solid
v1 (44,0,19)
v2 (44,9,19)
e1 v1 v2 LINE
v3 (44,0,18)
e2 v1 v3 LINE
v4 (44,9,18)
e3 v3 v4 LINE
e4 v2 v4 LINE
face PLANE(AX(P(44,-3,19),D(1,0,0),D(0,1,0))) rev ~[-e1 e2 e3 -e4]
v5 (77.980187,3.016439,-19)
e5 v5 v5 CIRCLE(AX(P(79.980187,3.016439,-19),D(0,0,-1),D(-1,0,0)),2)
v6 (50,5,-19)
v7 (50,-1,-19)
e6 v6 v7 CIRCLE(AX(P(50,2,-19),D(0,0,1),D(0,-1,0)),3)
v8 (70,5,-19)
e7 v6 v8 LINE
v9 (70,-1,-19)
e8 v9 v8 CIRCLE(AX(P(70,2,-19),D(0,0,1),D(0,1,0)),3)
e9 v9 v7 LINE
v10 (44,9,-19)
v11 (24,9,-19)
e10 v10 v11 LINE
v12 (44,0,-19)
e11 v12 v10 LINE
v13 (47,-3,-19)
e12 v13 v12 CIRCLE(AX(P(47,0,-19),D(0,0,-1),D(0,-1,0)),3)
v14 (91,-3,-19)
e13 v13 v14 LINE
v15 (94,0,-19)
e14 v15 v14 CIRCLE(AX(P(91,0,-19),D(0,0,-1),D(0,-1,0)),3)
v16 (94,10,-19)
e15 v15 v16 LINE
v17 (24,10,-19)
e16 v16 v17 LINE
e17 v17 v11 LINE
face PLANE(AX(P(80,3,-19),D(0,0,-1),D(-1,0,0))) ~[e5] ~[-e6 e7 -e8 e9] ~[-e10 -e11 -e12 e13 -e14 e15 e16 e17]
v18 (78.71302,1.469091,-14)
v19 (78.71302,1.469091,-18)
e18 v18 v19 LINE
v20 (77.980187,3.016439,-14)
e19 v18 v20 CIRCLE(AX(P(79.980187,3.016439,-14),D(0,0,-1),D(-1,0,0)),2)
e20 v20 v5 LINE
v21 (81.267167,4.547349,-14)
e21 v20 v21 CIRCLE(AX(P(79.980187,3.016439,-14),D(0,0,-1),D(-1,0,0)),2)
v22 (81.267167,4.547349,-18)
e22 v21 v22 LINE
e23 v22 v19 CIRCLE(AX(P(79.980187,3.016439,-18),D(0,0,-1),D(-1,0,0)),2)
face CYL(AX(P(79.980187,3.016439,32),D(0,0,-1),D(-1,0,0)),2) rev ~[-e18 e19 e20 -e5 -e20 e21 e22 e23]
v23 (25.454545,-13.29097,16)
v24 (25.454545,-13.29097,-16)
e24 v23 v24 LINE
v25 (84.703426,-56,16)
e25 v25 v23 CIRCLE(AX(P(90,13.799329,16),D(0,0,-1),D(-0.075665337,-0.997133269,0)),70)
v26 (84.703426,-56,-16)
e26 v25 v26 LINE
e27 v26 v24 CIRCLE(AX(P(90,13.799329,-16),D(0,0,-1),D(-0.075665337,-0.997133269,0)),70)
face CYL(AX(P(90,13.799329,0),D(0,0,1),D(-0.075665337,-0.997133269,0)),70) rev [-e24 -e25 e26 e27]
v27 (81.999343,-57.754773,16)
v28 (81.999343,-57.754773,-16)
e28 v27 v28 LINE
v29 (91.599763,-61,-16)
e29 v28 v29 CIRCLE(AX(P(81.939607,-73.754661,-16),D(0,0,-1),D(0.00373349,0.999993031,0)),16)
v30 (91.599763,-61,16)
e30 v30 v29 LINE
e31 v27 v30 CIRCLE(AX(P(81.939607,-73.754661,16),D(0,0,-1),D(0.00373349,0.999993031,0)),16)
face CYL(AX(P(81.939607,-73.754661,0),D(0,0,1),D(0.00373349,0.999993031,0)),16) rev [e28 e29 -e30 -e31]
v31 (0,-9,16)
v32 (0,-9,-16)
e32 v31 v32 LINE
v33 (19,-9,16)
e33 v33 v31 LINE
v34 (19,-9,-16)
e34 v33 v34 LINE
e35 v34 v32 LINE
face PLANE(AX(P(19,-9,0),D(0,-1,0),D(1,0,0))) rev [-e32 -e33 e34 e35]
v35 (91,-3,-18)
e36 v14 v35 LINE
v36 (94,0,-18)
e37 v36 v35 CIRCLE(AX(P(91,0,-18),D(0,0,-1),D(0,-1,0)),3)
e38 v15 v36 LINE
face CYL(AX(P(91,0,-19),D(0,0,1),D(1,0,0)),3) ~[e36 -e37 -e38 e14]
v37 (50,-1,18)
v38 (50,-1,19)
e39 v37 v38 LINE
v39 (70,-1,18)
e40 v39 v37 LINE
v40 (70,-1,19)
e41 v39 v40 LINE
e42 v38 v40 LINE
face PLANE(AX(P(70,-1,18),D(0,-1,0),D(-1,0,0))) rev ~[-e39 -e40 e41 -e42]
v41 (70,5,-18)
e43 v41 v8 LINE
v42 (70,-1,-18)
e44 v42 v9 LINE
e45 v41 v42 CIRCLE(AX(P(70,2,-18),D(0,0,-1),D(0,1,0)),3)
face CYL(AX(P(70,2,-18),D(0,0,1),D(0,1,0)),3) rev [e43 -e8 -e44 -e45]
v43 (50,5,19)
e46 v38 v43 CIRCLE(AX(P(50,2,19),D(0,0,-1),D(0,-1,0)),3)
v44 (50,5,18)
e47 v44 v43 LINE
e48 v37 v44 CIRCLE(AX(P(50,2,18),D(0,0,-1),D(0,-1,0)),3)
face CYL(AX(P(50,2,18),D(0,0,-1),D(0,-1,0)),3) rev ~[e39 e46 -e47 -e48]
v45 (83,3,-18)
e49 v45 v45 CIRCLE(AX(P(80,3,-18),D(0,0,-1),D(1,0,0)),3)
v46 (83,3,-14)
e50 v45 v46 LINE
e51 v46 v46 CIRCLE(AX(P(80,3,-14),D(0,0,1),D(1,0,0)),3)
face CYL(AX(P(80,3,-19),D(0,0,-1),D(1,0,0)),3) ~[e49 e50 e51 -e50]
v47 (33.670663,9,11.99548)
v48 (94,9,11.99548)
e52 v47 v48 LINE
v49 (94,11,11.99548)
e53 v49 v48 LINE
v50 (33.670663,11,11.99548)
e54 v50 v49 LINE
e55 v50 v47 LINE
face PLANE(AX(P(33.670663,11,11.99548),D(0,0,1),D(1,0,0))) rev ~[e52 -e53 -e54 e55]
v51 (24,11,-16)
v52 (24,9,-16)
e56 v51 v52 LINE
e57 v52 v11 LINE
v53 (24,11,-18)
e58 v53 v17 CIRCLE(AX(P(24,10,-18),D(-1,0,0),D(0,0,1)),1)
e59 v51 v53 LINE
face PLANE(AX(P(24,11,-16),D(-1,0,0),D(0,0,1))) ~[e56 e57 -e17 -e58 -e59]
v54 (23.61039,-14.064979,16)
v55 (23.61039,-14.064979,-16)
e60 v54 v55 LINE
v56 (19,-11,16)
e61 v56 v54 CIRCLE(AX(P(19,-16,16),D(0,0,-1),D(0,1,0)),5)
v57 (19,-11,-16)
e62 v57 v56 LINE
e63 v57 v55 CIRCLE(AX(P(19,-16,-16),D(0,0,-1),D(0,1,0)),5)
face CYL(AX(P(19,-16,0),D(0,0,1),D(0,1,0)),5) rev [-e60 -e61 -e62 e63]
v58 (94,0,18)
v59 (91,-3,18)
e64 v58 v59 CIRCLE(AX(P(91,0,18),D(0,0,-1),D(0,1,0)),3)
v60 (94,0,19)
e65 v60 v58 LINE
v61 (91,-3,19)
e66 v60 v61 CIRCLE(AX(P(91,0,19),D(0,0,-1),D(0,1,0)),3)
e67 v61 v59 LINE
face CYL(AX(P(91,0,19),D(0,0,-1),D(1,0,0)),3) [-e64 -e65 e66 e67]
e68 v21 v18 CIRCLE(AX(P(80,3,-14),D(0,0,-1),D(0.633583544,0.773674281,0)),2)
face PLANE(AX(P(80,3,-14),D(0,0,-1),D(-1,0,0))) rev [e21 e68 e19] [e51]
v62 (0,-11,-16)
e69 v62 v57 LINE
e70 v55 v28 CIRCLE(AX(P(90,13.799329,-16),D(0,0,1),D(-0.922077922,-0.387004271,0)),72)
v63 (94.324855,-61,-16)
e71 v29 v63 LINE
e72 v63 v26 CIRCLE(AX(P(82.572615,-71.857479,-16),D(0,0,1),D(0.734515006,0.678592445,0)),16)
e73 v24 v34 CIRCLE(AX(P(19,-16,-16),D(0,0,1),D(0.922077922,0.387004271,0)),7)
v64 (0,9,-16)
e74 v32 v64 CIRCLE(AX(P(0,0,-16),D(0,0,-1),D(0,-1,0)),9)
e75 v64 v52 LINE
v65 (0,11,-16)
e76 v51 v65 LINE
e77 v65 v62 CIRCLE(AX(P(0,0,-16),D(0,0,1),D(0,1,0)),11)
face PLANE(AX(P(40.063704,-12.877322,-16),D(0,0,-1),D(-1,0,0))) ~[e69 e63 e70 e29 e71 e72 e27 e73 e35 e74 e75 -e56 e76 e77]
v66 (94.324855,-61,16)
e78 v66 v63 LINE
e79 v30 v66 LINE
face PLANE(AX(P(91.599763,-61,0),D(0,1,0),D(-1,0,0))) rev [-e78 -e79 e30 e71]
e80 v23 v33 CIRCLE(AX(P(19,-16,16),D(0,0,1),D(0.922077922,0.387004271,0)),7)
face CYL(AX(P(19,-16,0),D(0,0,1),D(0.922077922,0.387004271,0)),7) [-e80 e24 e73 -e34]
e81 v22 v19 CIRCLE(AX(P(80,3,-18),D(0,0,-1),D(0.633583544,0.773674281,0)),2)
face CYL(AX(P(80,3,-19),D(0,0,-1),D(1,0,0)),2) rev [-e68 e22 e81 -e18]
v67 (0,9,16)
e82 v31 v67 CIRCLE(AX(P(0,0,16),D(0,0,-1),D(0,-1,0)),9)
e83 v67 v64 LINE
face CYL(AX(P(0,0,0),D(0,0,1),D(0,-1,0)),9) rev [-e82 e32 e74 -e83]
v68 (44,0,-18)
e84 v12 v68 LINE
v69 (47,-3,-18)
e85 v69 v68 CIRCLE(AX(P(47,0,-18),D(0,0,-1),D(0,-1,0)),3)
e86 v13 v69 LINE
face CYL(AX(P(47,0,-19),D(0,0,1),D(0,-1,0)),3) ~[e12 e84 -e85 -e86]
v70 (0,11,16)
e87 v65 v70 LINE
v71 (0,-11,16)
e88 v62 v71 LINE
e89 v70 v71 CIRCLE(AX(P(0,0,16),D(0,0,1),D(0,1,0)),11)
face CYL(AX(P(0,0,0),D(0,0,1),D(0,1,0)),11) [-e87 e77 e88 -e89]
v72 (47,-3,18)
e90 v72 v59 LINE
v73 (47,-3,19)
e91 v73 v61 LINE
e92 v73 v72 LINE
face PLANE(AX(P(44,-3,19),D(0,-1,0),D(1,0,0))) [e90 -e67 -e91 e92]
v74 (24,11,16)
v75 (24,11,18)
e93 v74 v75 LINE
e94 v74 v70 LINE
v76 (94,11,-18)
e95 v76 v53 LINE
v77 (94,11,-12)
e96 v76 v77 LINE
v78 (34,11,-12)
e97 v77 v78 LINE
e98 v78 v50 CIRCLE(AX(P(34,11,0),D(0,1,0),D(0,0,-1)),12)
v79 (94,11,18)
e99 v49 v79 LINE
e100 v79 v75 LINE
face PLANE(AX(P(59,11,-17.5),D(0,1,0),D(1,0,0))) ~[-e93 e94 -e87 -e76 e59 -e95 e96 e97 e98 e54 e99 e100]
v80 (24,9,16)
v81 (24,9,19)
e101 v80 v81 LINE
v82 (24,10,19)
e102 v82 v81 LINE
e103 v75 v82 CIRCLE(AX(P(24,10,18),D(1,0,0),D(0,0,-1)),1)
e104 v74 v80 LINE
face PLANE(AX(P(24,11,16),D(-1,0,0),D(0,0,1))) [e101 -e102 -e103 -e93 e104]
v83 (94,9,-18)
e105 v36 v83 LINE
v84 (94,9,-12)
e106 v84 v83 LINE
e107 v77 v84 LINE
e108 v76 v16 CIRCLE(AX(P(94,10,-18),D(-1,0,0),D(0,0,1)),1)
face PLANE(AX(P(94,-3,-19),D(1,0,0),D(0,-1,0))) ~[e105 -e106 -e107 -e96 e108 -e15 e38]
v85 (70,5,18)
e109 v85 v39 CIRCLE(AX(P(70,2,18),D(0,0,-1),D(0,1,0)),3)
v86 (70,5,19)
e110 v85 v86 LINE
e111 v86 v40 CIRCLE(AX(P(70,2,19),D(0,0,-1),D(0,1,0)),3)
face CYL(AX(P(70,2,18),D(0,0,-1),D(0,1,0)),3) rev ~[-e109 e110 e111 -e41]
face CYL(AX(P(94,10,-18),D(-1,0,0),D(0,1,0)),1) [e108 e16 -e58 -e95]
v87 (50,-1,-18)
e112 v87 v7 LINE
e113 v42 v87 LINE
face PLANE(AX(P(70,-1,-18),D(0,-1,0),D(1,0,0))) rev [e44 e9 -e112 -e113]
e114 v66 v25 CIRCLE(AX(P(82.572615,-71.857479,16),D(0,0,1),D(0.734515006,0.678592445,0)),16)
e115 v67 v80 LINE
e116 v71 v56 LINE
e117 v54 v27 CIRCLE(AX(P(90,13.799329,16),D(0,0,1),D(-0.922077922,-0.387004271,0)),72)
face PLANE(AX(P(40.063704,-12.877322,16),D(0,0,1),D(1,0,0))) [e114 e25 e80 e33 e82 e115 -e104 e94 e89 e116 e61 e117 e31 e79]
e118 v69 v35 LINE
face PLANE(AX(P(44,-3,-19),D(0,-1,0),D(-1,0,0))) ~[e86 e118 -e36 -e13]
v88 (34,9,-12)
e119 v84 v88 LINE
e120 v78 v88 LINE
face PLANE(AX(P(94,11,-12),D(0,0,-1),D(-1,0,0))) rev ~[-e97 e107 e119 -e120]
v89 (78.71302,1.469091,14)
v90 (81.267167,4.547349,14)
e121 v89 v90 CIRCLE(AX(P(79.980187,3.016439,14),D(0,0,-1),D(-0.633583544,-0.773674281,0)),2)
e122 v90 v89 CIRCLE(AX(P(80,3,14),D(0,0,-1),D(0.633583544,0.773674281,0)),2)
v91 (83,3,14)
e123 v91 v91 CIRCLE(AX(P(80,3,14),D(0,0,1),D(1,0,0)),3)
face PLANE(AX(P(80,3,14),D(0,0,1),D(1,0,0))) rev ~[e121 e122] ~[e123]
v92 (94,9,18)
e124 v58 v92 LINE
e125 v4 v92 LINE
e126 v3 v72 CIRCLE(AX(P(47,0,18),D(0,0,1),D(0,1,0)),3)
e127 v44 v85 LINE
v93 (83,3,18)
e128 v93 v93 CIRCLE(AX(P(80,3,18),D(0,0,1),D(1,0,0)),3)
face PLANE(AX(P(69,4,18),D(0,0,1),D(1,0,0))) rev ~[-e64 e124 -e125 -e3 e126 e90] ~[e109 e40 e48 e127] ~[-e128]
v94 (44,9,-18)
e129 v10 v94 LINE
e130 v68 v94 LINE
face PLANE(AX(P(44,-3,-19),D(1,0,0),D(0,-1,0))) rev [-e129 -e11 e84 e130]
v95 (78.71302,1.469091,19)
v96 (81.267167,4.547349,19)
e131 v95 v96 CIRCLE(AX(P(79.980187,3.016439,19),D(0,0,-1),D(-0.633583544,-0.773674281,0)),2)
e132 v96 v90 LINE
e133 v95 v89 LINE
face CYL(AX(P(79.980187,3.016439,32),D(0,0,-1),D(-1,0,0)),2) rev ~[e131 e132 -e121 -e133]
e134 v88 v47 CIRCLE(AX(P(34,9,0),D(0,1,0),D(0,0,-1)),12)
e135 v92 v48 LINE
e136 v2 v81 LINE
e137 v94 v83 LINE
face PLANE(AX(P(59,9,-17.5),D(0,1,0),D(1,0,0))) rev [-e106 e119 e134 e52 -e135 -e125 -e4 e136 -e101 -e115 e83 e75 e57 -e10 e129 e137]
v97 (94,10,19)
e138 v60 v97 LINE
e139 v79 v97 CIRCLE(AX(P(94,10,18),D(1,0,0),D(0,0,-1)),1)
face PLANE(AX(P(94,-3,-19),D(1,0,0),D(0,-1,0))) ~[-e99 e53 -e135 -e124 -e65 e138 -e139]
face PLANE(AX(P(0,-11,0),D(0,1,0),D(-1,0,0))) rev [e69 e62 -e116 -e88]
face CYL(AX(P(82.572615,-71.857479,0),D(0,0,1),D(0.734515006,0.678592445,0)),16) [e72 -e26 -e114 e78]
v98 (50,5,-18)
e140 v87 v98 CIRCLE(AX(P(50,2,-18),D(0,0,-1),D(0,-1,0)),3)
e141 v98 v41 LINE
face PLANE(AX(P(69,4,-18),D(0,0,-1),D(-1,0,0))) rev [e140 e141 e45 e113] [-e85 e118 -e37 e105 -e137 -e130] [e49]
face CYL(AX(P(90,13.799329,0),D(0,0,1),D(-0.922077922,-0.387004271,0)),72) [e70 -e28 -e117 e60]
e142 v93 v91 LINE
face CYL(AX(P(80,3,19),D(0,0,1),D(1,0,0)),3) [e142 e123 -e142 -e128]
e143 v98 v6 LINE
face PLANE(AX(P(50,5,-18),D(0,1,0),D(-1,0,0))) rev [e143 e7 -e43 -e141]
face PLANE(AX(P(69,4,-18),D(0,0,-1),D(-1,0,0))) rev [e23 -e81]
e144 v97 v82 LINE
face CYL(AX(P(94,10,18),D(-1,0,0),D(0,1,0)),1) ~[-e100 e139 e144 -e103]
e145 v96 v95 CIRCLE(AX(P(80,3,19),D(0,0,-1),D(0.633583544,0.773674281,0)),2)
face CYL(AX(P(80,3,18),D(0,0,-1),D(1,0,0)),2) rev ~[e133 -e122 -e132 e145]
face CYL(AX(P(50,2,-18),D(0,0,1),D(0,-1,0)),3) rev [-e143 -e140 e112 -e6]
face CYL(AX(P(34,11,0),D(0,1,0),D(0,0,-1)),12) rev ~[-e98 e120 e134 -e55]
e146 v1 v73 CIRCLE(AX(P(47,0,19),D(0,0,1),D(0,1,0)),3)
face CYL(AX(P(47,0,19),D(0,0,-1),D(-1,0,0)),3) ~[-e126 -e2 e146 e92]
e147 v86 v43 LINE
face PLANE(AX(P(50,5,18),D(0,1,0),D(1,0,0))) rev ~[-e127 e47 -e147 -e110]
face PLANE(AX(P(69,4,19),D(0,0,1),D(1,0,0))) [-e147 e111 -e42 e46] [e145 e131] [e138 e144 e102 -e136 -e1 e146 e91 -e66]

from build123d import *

# Parameters (mm, degrees)
F1_DEPTH  = 16
F2_W      = 70
F2_H      = 3
F3_DEPTH  = 2
F4_W      = 50
F4_H      = 14
F5_DEPTH  = 1
F6_R      = 1
F9_DEPTH  = 2
F11_DEPTH = 1.001
F13_D     = 4
F13_DEPTH = 50
F13_TIP   = 1.2017212381
F14_R     = 3
F14_R_2   = 2
F15_DEPTH = 5
F16_R     = 3
F18_D     = 4
F18_DEPTH = 50
F18_START = 37
F18_TIP   = 1.2017212381


# Not quite as in the source:
# - a pattern or mirror of a feature is missing from the dataset's text; its kind, count and spacing are read off the source's solid
# - a feature names something its author has since deleted; it is built from what else it names


with BuildPart() as f1:
    # F0 (on Top) → F1 (new body)
    with BuildSketch(Plane.XY):
        with BuildLine():
            Line((94, 11), (0, 11))
            ThreePointArc((0, 11), (-11, 0), (0, -11))
            Line((0, -11), (19, -11))
            ThreePointArc((19, -11), (21.7681124643, -11.8361612201), (23.6103896104, -14.064978646))
            ThreePointArc((23.6103896104, -14.064978646), (46.8644288503, -43.8489365308), (81.9993431207, -57.7547729841))
            ThreePointArc((81.9993431207, -57.7547729841), (87.0632727772, -58.5972193444), (91.5997631119, -61))
            Line((91.5997631119, -61), (94.3248553538, -61))
            ThreePointArc((94.3248553538, -61), (89.9506080698, -57.6601123846), (84.7034264019, -56))
            ThreePointArc((84.7034264019, -56), (49.0672193413, -42.9854179344), (25.4545454545, -13.2909701044))
            ThreePointArc((25.4545454545, -13.2909701044), (22.87535745, -10.1706257081), (19, -9))
            Line((19, -9), (0, -9))
            ThreePointArc((0, -9), (-9, 0), (0, 9))
            Line((0, 9), (94, 9))
            Line((94, 9), (94, 11))
        make_face()
    extrude(amount=F1_DEPTH)

    # F2 (on face) → F3 (join)
    with BuildSketch(Plane(origin=(0, 11, 0), x_dir=(-1, 0, 0), z_dir=(0, 1, 0))):
        with Locations((-59, 17.5)):
            Rectangle(F2_W, F2_H)
    extrude(amount=-F3_DEPTH)

    # F4 (on face) → F5 (join)
    with BuildSketch(Plane.XY.offset(19)):
        with Locations((69, 4)):
            Rectangle(F4_W, F4_H)
    extrude(amount=-F5_DEPTH)

    # F6
    f6_edges = [f1.edges().sort_by_distance(p)[0] for p in [
        (59, 11, 19),
    ]]
    fillet(f6_edges, radius=F6_R)

    # F7: F1 across face


with BuildPart() as f1_1:
    add(f1.part)
    add(f1.part.mirror(Plane(origin=(39.0198924269, -12.8147332924, 0), x_dir=(1, 0, 0), z_dir=(0, 0, -1))))

    # F8 (on face) → F9 (cut)
    with BuildSketch(Plane(origin=(0, 11, 0), x_dir=(-1, 0, 0), z_dir=(0, 1, 0))):
        with BuildLine():
            Line((-94, -12), (-34, -12))
            ThreePointArc((-34, -12), (-22.001130085, -0.1646838272), (-33.6706633635, 11.9954798728))
            Line((-33.6706633635, 11.9954798728), (-34.3293366365, 11.9954798728))
            Line((-34.3293366365, 11.9954798728), (-94, 11.9954798728))
            Line((-94, 11.9954798728), (-94, -12))
        make_face()
    extrude(amount=-F9_DEPTH, mode=Mode.SUBTRACT)

    # F10 (on face) → F11 (cut, through all)
    with BuildSketch(Plane(origin=(0, 0, 18), x_dir=(1, 0, 0), z_dir=(0, 0, -1))):
        with BuildLine():
            ThreePointArc((50, 1), (47, -2), (50, -5))
            Line((50, -5), (70, -5))
            ThreePointArc((70, -5), (73, -2), (70, 1))
            Line((70, 1), (50, 1))
        make_face()
    f11 = extrude(amount=-F11_DEPTH, mode=Mode.SUBTRACT)

    # F11_copies: F11 across plane
    add(f11.mirror(Plane(origin=(0, 0, 0), x_dir=(-1, 0, 0), z_dir=(0, 0, -1))), mode=Mode.SUBTRACT)

    # F13 (one way)
    with BuildSketch(Plane(origin=(0, 0, 18), x_dir=(1, 0, 0), z_dir=(0, 0, -1))):
        with Locations((80, -3)):
            Circle(F13_D / 2)
    extrude(amount=-F13_DEPTH, mode=Mode.SUBTRACT)
    with Locations(Plane(origin=(0, 0, 18), x_dir=(1, 0, 0), z_dir=(0, 0, -1))):
        with Locations((80, -3)):
            with Locations((0, 0, -(F13_DEPTH + F13_TIP / 2))):  # 118° drill point
                Cone(0, F13_D / 2, F13_TIP, mode=Mode.SUBTRACT)

    # F14 (on face) → F15 (join)
    with BuildSketch(Plane.XY.offset(19)):
        with Locations((80, 3)):
            Circle(F14_R)
        with Locations((80, 3)):
            Circle(F14_R_2, mode=Mode.SUBTRACT)
    f15 = extrude(amount=-F15_DEPTH)

    # F15_copies: F15 across plane
    add(f15.mirror(Plane(origin=(0, 0, 0), x_dir=(-1, 0, 0), z_dir=(0, 0, -1))))

    # F16
    f16_edges = [f1_1.edges().sort_by_distance(p)[0] for p in [
        (94, -3, 18.5),
        (44, -3, 18.5),
        (44, -3, -18.5),
        (94, -3, -18.5),
    ]]
    fillet(f16_edges, radius=F16_R)

    # F18
    # its depths count from where the whole tool has entered the part; down to there all is cleared
    with Locations(Plane.XY.offset(19).offset(-F18_START)):
        with Locations((79.9801871181, 3.0164394993)):
            Hole(F18_D / 2, depth=F18_DEPTH)
            with Locations((0, 0, -(F18_DEPTH + F18_TIP / 2))):  # 118° drill point
                Cone(0, F18_D / 2, F18_TIP, mode=Mode.SUBTRACT)


solid = f1_1.part
